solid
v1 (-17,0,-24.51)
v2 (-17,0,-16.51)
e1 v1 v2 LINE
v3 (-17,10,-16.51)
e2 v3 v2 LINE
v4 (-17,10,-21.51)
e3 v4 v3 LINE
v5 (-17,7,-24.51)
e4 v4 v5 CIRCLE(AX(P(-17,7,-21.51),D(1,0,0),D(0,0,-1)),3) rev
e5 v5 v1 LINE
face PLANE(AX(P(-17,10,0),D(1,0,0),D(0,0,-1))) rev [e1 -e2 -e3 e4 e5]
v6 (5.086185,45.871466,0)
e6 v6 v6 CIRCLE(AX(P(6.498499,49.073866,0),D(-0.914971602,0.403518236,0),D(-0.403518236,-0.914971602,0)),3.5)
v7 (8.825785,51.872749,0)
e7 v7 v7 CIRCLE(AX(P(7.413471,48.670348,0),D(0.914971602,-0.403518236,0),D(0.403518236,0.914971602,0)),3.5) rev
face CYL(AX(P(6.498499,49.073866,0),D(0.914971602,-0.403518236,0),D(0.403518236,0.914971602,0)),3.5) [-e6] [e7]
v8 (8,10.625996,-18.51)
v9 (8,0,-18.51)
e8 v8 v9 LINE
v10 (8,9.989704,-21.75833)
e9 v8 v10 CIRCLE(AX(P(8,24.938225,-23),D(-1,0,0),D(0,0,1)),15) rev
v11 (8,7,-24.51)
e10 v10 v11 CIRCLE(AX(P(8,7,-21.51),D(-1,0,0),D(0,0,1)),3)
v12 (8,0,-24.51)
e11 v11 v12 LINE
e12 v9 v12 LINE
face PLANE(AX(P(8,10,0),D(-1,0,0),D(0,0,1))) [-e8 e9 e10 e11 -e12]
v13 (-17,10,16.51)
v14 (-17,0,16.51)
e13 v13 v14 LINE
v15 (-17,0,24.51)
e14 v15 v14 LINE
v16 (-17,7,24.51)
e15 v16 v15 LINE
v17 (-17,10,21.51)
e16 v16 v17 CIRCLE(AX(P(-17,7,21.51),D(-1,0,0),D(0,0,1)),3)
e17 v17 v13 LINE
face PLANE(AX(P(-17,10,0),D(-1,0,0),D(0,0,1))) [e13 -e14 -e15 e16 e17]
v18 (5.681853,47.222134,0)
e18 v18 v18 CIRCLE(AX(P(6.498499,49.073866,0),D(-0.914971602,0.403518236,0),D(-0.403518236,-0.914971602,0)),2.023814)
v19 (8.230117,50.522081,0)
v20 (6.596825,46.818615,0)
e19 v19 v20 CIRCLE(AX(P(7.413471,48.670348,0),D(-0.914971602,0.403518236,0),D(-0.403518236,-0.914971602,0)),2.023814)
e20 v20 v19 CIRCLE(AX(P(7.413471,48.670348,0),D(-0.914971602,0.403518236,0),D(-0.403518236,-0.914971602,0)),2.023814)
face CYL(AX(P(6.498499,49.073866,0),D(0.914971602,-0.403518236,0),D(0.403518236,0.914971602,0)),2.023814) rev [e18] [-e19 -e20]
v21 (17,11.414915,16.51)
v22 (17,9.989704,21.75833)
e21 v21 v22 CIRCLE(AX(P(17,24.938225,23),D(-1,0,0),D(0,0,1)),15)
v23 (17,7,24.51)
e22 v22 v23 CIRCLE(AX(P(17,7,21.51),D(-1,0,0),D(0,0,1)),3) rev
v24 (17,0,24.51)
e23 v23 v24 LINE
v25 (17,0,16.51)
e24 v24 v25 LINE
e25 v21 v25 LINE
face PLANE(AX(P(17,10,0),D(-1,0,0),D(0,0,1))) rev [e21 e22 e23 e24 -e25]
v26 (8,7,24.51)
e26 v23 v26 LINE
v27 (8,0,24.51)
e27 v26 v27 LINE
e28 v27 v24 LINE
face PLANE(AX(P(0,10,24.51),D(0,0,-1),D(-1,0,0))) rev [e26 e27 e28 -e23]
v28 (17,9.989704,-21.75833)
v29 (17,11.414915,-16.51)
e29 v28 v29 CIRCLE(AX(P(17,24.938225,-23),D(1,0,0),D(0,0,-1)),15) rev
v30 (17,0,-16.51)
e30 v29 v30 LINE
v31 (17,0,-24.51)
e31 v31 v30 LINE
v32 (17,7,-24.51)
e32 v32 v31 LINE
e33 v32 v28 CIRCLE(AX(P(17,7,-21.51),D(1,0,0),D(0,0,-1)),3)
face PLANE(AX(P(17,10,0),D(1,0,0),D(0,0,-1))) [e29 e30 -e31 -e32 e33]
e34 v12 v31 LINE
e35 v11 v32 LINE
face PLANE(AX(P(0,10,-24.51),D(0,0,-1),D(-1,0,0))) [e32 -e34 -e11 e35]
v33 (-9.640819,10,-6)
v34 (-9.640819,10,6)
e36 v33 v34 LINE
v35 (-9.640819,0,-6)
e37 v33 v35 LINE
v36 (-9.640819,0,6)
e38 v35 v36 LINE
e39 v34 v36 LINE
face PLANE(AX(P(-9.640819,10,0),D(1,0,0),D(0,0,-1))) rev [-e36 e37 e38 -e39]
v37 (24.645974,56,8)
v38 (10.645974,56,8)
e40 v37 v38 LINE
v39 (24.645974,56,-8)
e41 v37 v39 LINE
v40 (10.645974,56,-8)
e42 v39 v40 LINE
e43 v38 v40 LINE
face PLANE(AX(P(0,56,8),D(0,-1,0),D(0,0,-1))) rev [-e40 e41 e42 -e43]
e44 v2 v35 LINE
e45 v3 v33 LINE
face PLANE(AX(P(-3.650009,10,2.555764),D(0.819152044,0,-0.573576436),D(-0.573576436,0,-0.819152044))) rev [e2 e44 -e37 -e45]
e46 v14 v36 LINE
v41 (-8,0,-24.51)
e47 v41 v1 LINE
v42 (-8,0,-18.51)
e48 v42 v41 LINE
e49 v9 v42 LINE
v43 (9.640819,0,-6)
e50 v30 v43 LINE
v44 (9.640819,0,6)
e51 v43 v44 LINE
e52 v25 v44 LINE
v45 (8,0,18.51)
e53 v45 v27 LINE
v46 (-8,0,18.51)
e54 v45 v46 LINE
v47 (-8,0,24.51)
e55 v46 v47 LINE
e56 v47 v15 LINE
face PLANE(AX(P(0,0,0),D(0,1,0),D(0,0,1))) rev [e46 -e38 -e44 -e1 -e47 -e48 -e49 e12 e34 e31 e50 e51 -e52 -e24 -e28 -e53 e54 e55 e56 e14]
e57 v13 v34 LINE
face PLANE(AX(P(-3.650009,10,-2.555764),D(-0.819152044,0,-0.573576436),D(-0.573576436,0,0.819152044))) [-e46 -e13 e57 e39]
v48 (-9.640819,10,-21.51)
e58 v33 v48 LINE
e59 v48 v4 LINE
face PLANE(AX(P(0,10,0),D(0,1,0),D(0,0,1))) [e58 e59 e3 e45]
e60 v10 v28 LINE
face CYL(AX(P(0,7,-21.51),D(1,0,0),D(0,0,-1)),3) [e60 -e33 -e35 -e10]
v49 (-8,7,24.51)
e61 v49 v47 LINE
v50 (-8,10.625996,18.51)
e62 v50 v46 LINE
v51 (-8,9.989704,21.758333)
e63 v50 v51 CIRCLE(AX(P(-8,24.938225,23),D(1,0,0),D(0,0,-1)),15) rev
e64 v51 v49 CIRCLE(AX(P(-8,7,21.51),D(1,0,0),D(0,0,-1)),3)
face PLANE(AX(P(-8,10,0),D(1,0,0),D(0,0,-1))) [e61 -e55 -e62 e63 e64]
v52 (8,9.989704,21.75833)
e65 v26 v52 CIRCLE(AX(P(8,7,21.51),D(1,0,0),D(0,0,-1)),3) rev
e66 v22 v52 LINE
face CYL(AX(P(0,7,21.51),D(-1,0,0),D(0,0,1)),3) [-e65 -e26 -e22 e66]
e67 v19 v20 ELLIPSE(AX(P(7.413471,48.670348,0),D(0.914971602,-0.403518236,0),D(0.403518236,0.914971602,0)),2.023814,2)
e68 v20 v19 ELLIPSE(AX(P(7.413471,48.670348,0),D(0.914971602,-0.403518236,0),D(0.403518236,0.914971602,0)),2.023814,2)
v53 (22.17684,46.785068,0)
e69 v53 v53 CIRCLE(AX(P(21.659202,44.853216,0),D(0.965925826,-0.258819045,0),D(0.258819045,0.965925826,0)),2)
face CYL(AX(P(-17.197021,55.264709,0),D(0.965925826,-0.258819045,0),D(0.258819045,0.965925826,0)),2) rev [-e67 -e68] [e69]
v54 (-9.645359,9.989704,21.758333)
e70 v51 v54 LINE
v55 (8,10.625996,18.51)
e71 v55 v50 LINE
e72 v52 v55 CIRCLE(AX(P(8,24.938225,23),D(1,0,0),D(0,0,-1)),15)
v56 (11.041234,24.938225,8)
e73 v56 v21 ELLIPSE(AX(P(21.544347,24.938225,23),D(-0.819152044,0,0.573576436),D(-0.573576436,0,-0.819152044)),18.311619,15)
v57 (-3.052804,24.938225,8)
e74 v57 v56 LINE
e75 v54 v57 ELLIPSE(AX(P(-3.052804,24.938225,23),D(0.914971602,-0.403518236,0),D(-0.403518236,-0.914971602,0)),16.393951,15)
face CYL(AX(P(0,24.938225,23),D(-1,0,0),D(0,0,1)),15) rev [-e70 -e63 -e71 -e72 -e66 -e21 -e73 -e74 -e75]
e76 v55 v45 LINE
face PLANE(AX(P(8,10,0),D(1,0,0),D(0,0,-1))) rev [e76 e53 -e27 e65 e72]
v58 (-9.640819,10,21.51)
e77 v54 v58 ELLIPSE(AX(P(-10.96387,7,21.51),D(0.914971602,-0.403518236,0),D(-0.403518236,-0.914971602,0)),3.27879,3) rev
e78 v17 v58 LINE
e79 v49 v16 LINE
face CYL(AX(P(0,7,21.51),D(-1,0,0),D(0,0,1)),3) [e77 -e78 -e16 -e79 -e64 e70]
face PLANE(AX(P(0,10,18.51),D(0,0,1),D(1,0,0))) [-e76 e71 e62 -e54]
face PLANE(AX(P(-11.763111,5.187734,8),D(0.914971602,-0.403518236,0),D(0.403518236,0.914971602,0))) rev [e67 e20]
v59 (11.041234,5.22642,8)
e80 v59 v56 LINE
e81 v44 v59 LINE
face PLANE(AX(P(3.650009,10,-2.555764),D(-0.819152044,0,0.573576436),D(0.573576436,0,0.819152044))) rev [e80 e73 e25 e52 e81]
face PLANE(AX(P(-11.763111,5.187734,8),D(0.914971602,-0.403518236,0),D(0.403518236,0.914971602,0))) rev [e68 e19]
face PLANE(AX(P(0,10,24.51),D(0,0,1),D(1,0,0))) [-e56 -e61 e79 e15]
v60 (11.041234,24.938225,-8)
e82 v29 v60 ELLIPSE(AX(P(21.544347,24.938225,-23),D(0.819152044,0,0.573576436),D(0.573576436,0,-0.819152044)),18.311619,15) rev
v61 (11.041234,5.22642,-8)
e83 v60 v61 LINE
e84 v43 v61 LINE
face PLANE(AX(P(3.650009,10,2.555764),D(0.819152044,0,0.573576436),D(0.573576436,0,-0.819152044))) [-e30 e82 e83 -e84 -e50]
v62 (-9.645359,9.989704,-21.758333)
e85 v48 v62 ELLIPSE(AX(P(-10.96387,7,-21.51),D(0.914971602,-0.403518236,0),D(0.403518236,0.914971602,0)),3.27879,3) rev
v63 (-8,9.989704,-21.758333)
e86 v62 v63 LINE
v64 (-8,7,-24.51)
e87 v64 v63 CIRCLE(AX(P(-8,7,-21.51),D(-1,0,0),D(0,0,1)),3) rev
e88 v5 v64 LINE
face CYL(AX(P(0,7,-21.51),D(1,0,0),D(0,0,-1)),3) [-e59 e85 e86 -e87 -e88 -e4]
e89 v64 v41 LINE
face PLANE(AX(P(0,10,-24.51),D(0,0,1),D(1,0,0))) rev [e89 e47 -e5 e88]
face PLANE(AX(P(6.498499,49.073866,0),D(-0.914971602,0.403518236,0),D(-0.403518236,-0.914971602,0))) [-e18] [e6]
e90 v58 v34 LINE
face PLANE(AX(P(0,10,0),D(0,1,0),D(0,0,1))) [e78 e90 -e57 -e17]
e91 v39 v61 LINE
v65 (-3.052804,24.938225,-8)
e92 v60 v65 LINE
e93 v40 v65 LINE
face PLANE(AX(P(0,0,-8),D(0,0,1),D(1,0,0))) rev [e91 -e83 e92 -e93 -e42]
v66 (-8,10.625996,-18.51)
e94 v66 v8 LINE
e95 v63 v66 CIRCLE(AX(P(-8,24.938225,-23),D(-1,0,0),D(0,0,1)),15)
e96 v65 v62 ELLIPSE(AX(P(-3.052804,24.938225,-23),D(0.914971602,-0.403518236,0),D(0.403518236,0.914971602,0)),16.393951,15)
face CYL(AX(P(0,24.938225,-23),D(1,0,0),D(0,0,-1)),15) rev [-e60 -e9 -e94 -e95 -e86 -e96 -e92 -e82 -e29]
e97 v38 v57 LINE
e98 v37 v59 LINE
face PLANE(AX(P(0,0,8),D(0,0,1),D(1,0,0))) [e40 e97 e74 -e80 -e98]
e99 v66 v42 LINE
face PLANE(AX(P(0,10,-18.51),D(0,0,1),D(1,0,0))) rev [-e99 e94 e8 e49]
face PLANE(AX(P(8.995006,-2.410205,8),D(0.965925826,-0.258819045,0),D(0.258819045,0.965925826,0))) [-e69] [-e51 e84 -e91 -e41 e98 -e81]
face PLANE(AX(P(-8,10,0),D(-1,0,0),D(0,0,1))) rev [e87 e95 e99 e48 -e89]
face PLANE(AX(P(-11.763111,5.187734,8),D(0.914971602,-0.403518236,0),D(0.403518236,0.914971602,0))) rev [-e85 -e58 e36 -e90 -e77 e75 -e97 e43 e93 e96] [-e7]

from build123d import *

# Parameters (mm, degrees)
SALIENTE_EXTRUIR1_DEPTH = 10
REDONDEO1_R             = 3
SALIENTE_EXTRUIR2_DEPTH = 8
REDONDEO2_R             = 15
CROQUIS6_R              = 2
CORTAR_EXTRUIR1_DEPTH   = 69.470668674
CROQUIS7_R              = 3.5
CROQUIS7_R_2            = 2.023814415
SALIENTE_EXTRUIR4_DEPTH = 1


with BuildPart() as part:
    # Croquis1 → Saliente-Extruir1 (new body)
    with BuildSketch(Plane(origin=(0, 0, 0), x_dir=(1, 0, 0), z_dir=(0, 1, 0))):
        Polygon((8, 18.51), (8, 24.51), (17, 24.51), (17, 16.51), (9.640818773, 6), (9.640818773, -6), (17, -16.51), (17, -24.51), (8, -24.51), (8, -18.51), (-8, -18.51), (-8, -24.51), (-17, -24.51), (-17, -16.51), (-9.640818773, -6), (-9.640818773, 6), (-17, 16.51), (-17, 24.51), (-8, 24.51), (-8, 18.51), align=None)
    extrude(amount=SALIENTE_EXTRUIR1_DEPTH)

    # Redondeo1
    redondeo1_edges = [part.edges().sort_by_distance(p)[0] for p in [
        (12.5, 10, -24.51),
        (-12.5, 10, -24.51),
        (-12.5, 10, 24.51),
        (12.5, 10, 24.51),
    ]]
    fillet(redondeo1_edges, radius=REDONDEO1_R)

    # Croquis4 → Saliente-Extruir2 (add, symmetric)
    with BuildSketch(Plane.XY):
        Polygon((9.640818773, 0), (24.64597355, 56), (10.64597355, 56), (-9.640818773, 10), (-9.640818773, 0), align=None)
    extrude(amount=SALIENTE_EXTRUIR2_DEPTH, both=True)

    # Redondeo2
    # the kernel refuses this fillet: 15 mm, written as the material it adds along each edge
    with BuildSketch(Plane(origin=(48.386795224, 10, 8), x_dir=(0, -0.0007483395866258935, 0.9999997199938924), z_dir=(-1, 0, 0))) as redondeo2_piece_1_section:
        with BuildLine():
            CenterArc((14.988816935, 14.949445461), REDONDEO2_R, 180.042876704, 85.251749502)
            Line((-0.011178865, 14.938220367), (-1.511178445, 14.937097858))
            Line((-1.511178445, 14.937097858), (-1.49999958, -0.001122509))
            Line((-1.49999958, -0.001122509), (0.001122509, -1.49999958))
            ThreePointArc((0.001122509, -1.49999958), (13.511118726, -1.489889512), (13.635289211, -1.494944546))
            Line((13.635289211, -1.494944546), (13.758337186, 0))
        make_face()
    redondeo2_piece_1 = extrude(amount=95.373175372, mode=Mode.PRIVATE)
    redondeo2_piece_1 = split(redondeo2_piece_1, bisect_by=Plane(origin=(8, 10, 8), z_dir=(1, 0, 0)), keep=Keep.TOP, mode=Mode.PRIVATE)
    redondeo2_piece_1 = split(redondeo2_piece_1, bisect_by=Plane(origin=(17, 10, 8), z_dir=(-1, 0, 0)), keep=Keep.TOP, mode=Mode.PRIVATE)
    redondeo2_piece_1 = split(redondeo2_piece_1, bisect_by=Plane(origin=(23.32754741, 10, 25.546674221), z_dir=(-0.8191520442889914, 0, 0.5735764363510469)), keep=Keep.TOP, mode=Mode.PRIVATE)
    add(redondeo2_piece_1)
    with BuildSketch(Plane(origin=(48.386795224, 10, 8), x_dir=(0, -0.0007483395866258935, 0.9999997199938924), z_dir=(-1, 0, 0))) as redondeo2_piece_2_section:
        with BuildLine():
            CenterArc((14.988816935, 14.949445461), REDONDEO2_R, 180.042876704, 85.251749502)
            Line((-0.011178865, 14.938220367), (-1.511178445, 14.937097858))
            Line((-1.511178445, 14.937097858), (-1.49999958, -0.001122509))
            Line((-1.49999958, -0.001122509), (0.001122509, -1.49999958))
            ThreePointArc((0.001122509, -1.49999958), (13.511118726, -1.489889512), (13.635289211, -1.494944546))
            Line((13.635289211, -1.494944546), (13.758337186, 0))
        make_face()
    redondeo2_piece_2 = extrude(amount=95.373175372, mode=Mode.PRIVATE)
    redondeo2_piece_2 = split(redondeo2_piece_2, bisect_by=Plane(origin=(-0.192358376, 31.424243485, 8), z_dir=(0.9149716022207091, -0.4035182364276348, 0)), keep=Keep.TOP, mode=Mode.PRIVATE)
    redondeo2_piece_2 = split(redondeo2_piece_2, bisect_by=Plane(origin=(48.386795224, 10, 18.51), z_dir=(0, 0, -1)), keep=Keep.TOP, mode=Mode.PRIVATE)
    redondeo2_piece_2 = split(redondeo2_piece_2, bisect_by=Plane(origin=(17, 10, 8), z_dir=(-1, 0, 0)), keep=Keep.TOP, mode=Mode.PRIVATE)
    redondeo2_piece_2 = split(redondeo2_piece_2, bisect_by=Plane(origin=(23.32754741, 10, 25.546674221), z_dir=(-0.8191520442889914, 0, 0.5735764363510469)), keep=Keep.TOP, mode=Mode.PRIVATE)
    add(redondeo2_piece_2)
    with BuildSketch(Plane(origin=(48.386795224, 10, 8), x_dir=(0, -0.0007483395866258935, 0.9999997199938924), z_dir=(-1, 0, 0))) as redondeo2_piece_3_section:
        with BuildLine():
            CenterArc((14.988816935, 14.949445461), REDONDEO2_R, 180.042876704, 85.251749502)
            Line((-0.011178865, 14.938220367), (-1.511178445, 14.937097858))
            Line((-1.511178445, 14.937097858), (-1.49999958, -0.001122509))
            Line((-1.49999958, -0.001122509), (0.001122509, -1.49999958))
            ThreePointArc((0.001122509, -1.49999958), (13.511118726, -1.489889512), (13.635289211, -1.494944546))
            Line((13.635289211, -1.494944546), (13.758337186, 0))
        make_face()
    redondeo2_piece_3 = extrude(amount=95.373175372, mode=Mode.PRIVATE)
    redondeo2_piece_3 = split(redondeo2_piece_3, bisect_by=Plane(origin=(-0.192358376, 31.424243485, 8), z_dir=(0.9149716022207091, -0.4035182364276348, 0)), keep=Keep.TOP, mode=Mode.PRIVATE)
    redondeo2_piece_3 = split(redondeo2_piece_3, bisect_by=Plane(origin=(-8, 10, 8), z_dir=(-1, 0, 0)), keep=Keep.TOP, mode=Mode.PRIVATE)
    add(redondeo2_piece_3)
    with BuildSketch(Plane(origin=(48.386795224, 10, -8), x_dir=(0, -0.0007483395866258937, -0.9999997199938924), z_dir=(-1, 0, 0))) as redondeo2_piece_4_section:
        with BuildLine():
            CenterArc((14.988816935, -14.949445461), REDONDEO2_R, 94.705373794, 85.251749502)
            Line((-0.011178865, -14.938220367), (-1.511178445, -14.937097858))
            Line((-1.511178445, -14.937097858), (-1.49999958, 0.001122509))
            Line((-1.49999958, 0.001122509), (0.001122509, 1.49999958))
            ThreePointArc((0.001122509, 1.49999958), (13.511118726, 1.489889512), (13.635289211, 1.494944546))
            Line((13.635289211, 1.494944546), (13.758337186, 0))
        make_face()
    redondeo2_piece_4 = extrude(amount=95.373175372, mode=Mode.PRIVATE)
    redondeo2_piece_4 = split(redondeo2_piece_4, bisect_by=Plane(origin=(8, 10, -8), z_dir=(1, 0, 0)), keep=Keep.TOP, mode=Mode.PRIVATE)
    redondeo2_piece_4 = split(redondeo2_piece_4, bisect_by=Plane(origin=(17, 10, -8), z_dir=(-1, 0, 0)), keep=Keep.TOP, mode=Mode.PRIVATE)
    redondeo2_piece_4 = split(redondeo2_piece_4, bisect_by=Plane(origin=(23.32754741, 10, -25.546674221), z_dir=(-0.8191520442889914, 0, -0.5735764363510469)), keep=Keep.TOP, mode=Mode.PRIVATE)
    add(redondeo2_piece_4)
    with BuildSketch(Plane(origin=(48.386795224, 10, -8), x_dir=(0, -0.0007483395866258937, -0.9999997199938924), z_dir=(-1, 0, 0))) as redondeo2_piece_5_section:
        with BuildLine():
            CenterArc((14.988816935, -14.949445461), REDONDEO2_R, 94.705373794, 85.251749502)
            Line((-0.011178865, -14.938220367), (-1.511178445, -14.937097858))
            Line((-1.511178445, -14.937097858), (-1.49999958, 0.001122509))
            Line((-1.49999958, 0.001122509), (0.001122509, 1.49999958))
            ThreePointArc((0.001122509, 1.49999958), (13.511118726, 1.489889512), (13.635289211, 1.494944546))
            Line((13.635289211, 1.494944546), (13.758337186, 0))
        make_face()
    redondeo2_piece_5 = extrude(amount=95.373175372, mode=Mode.PRIVATE)
    redondeo2_piece_5 = split(redondeo2_piece_5, bisect_by=Plane(origin=(48.386795224, 10, -18.51), z_dir=(0, 0, 1)), keep=Keep.TOP, mode=Mode.PRIVATE)
    redondeo2_piece_5 = split(redondeo2_piece_5, bisect_by=Plane(origin=(23.32754741, 10, -25.546674221), z_dir=(-0.8191520442889914, 0, -0.5735764363510469)), keep=Keep.TOP, mode=Mode.PRIVATE)
    redondeo2_piece_5 = split(redondeo2_piece_5, bisect_by=Plane(origin=(-0.192358376, 31.424243485, -8), z_dir=(0.9149716022207091, -0.4035182364276348, 0)), keep=Keep.TOP, mode=Mode.PRIVATE)
    redondeo2_piece_5 = split(redondeo2_piece_5, bisect_by=Plane(origin=(14.736307048, 19.016621132, -8), z_dir=(-0.9659258262890673, 0.2588190451025247, 0)), keep=Keep.TOP, mode=Mode.PRIVATE)
    add(redondeo2_piece_5)
    with BuildSketch(Plane(origin=(48.386795224, 10, -8), x_dir=(0, -0.0007483395866258937, -0.9999997199938924), z_dir=(-1, 0, 0))) as redondeo2_piece_6_section:
        with BuildLine():
            CenterArc((14.988816935, -14.949445461), REDONDEO2_R, 94.705373794, 85.251749502)
            Line((-0.011178865, -14.938220367), (-1.511178445, -14.937097858))
            Line((-1.511178445, -14.937097858), (-1.49999958, 0.001122509))
            Line((-1.49999958, 0.001122509), (0.001122509, 1.49999958))
            ThreePointArc((0.001122509, 1.49999958), (13.511118726, 1.489889512), (13.635289211, 1.494944546))
            Line((13.635289211, 1.494944546), (13.758337186, 0))
        make_face()
    redondeo2_piece_6 = extrude(amount=95.373175372, mode=Mode.PRIVATE)
    redondeo2_piece_6 = split(redondeo2_piece_6, bisect_by=Plane(origin=(-8, 10, -8), z_dir=(-1, 0, 0)), keep=Keep.TOP, mode=Mode.PRIVATE)
    redondeo2_piece_6 = split(redondeo2_piece_6, bisect_by=Plane(origin=(-0.192358376, 31.424243485, -8), z_dir=(0.9149716022207091, -0.4035182364276348, 0)), keep=Keep.TOP, mode=Mode.PRIVATE)
    add(redondeo2_piece_6)

    # Croquis6 → Cortar-Extruir1 (cut, through all)
    with BuildSketch(Plane(origin=(8.995006372, -2.410204693, 0), x_dir=(0, 0, -1), z_dir=(0.9659258262890673, -0.25881904510252474, 0))):
        with Locations(Location((0, 48.930693612, 0), (0, 0, 90))):
            Circle(CROQUIS6_R)
    extrude(amount=-CORTAR_EXTRUIR1_DEPTH, mode=Mode.SUBTRACT)

    # Croquis7 → Saliente-Extruir4 (add)
    with BuildSketch(Plane(origin=(-11.763110765, 5.18773446, 0), x_dir=(0, 0, 1), z_dir=(-0.9149716022207091, 0.40351823642763496, 0))):
        with Locations(Location((0, 47.523457021, 0), (0, 0, 90))):
            Circle(CROQUIS7_R)
        with Locations(Location((0, 47.523457021, 0), (0, 0, 270))):
            Circle(CROQUIS7_R_2, mode=Mode.SUBTRACT)
    extrude(amount=SALIENTE_EXTRUIR4_DEPTH)


solid = part.part
